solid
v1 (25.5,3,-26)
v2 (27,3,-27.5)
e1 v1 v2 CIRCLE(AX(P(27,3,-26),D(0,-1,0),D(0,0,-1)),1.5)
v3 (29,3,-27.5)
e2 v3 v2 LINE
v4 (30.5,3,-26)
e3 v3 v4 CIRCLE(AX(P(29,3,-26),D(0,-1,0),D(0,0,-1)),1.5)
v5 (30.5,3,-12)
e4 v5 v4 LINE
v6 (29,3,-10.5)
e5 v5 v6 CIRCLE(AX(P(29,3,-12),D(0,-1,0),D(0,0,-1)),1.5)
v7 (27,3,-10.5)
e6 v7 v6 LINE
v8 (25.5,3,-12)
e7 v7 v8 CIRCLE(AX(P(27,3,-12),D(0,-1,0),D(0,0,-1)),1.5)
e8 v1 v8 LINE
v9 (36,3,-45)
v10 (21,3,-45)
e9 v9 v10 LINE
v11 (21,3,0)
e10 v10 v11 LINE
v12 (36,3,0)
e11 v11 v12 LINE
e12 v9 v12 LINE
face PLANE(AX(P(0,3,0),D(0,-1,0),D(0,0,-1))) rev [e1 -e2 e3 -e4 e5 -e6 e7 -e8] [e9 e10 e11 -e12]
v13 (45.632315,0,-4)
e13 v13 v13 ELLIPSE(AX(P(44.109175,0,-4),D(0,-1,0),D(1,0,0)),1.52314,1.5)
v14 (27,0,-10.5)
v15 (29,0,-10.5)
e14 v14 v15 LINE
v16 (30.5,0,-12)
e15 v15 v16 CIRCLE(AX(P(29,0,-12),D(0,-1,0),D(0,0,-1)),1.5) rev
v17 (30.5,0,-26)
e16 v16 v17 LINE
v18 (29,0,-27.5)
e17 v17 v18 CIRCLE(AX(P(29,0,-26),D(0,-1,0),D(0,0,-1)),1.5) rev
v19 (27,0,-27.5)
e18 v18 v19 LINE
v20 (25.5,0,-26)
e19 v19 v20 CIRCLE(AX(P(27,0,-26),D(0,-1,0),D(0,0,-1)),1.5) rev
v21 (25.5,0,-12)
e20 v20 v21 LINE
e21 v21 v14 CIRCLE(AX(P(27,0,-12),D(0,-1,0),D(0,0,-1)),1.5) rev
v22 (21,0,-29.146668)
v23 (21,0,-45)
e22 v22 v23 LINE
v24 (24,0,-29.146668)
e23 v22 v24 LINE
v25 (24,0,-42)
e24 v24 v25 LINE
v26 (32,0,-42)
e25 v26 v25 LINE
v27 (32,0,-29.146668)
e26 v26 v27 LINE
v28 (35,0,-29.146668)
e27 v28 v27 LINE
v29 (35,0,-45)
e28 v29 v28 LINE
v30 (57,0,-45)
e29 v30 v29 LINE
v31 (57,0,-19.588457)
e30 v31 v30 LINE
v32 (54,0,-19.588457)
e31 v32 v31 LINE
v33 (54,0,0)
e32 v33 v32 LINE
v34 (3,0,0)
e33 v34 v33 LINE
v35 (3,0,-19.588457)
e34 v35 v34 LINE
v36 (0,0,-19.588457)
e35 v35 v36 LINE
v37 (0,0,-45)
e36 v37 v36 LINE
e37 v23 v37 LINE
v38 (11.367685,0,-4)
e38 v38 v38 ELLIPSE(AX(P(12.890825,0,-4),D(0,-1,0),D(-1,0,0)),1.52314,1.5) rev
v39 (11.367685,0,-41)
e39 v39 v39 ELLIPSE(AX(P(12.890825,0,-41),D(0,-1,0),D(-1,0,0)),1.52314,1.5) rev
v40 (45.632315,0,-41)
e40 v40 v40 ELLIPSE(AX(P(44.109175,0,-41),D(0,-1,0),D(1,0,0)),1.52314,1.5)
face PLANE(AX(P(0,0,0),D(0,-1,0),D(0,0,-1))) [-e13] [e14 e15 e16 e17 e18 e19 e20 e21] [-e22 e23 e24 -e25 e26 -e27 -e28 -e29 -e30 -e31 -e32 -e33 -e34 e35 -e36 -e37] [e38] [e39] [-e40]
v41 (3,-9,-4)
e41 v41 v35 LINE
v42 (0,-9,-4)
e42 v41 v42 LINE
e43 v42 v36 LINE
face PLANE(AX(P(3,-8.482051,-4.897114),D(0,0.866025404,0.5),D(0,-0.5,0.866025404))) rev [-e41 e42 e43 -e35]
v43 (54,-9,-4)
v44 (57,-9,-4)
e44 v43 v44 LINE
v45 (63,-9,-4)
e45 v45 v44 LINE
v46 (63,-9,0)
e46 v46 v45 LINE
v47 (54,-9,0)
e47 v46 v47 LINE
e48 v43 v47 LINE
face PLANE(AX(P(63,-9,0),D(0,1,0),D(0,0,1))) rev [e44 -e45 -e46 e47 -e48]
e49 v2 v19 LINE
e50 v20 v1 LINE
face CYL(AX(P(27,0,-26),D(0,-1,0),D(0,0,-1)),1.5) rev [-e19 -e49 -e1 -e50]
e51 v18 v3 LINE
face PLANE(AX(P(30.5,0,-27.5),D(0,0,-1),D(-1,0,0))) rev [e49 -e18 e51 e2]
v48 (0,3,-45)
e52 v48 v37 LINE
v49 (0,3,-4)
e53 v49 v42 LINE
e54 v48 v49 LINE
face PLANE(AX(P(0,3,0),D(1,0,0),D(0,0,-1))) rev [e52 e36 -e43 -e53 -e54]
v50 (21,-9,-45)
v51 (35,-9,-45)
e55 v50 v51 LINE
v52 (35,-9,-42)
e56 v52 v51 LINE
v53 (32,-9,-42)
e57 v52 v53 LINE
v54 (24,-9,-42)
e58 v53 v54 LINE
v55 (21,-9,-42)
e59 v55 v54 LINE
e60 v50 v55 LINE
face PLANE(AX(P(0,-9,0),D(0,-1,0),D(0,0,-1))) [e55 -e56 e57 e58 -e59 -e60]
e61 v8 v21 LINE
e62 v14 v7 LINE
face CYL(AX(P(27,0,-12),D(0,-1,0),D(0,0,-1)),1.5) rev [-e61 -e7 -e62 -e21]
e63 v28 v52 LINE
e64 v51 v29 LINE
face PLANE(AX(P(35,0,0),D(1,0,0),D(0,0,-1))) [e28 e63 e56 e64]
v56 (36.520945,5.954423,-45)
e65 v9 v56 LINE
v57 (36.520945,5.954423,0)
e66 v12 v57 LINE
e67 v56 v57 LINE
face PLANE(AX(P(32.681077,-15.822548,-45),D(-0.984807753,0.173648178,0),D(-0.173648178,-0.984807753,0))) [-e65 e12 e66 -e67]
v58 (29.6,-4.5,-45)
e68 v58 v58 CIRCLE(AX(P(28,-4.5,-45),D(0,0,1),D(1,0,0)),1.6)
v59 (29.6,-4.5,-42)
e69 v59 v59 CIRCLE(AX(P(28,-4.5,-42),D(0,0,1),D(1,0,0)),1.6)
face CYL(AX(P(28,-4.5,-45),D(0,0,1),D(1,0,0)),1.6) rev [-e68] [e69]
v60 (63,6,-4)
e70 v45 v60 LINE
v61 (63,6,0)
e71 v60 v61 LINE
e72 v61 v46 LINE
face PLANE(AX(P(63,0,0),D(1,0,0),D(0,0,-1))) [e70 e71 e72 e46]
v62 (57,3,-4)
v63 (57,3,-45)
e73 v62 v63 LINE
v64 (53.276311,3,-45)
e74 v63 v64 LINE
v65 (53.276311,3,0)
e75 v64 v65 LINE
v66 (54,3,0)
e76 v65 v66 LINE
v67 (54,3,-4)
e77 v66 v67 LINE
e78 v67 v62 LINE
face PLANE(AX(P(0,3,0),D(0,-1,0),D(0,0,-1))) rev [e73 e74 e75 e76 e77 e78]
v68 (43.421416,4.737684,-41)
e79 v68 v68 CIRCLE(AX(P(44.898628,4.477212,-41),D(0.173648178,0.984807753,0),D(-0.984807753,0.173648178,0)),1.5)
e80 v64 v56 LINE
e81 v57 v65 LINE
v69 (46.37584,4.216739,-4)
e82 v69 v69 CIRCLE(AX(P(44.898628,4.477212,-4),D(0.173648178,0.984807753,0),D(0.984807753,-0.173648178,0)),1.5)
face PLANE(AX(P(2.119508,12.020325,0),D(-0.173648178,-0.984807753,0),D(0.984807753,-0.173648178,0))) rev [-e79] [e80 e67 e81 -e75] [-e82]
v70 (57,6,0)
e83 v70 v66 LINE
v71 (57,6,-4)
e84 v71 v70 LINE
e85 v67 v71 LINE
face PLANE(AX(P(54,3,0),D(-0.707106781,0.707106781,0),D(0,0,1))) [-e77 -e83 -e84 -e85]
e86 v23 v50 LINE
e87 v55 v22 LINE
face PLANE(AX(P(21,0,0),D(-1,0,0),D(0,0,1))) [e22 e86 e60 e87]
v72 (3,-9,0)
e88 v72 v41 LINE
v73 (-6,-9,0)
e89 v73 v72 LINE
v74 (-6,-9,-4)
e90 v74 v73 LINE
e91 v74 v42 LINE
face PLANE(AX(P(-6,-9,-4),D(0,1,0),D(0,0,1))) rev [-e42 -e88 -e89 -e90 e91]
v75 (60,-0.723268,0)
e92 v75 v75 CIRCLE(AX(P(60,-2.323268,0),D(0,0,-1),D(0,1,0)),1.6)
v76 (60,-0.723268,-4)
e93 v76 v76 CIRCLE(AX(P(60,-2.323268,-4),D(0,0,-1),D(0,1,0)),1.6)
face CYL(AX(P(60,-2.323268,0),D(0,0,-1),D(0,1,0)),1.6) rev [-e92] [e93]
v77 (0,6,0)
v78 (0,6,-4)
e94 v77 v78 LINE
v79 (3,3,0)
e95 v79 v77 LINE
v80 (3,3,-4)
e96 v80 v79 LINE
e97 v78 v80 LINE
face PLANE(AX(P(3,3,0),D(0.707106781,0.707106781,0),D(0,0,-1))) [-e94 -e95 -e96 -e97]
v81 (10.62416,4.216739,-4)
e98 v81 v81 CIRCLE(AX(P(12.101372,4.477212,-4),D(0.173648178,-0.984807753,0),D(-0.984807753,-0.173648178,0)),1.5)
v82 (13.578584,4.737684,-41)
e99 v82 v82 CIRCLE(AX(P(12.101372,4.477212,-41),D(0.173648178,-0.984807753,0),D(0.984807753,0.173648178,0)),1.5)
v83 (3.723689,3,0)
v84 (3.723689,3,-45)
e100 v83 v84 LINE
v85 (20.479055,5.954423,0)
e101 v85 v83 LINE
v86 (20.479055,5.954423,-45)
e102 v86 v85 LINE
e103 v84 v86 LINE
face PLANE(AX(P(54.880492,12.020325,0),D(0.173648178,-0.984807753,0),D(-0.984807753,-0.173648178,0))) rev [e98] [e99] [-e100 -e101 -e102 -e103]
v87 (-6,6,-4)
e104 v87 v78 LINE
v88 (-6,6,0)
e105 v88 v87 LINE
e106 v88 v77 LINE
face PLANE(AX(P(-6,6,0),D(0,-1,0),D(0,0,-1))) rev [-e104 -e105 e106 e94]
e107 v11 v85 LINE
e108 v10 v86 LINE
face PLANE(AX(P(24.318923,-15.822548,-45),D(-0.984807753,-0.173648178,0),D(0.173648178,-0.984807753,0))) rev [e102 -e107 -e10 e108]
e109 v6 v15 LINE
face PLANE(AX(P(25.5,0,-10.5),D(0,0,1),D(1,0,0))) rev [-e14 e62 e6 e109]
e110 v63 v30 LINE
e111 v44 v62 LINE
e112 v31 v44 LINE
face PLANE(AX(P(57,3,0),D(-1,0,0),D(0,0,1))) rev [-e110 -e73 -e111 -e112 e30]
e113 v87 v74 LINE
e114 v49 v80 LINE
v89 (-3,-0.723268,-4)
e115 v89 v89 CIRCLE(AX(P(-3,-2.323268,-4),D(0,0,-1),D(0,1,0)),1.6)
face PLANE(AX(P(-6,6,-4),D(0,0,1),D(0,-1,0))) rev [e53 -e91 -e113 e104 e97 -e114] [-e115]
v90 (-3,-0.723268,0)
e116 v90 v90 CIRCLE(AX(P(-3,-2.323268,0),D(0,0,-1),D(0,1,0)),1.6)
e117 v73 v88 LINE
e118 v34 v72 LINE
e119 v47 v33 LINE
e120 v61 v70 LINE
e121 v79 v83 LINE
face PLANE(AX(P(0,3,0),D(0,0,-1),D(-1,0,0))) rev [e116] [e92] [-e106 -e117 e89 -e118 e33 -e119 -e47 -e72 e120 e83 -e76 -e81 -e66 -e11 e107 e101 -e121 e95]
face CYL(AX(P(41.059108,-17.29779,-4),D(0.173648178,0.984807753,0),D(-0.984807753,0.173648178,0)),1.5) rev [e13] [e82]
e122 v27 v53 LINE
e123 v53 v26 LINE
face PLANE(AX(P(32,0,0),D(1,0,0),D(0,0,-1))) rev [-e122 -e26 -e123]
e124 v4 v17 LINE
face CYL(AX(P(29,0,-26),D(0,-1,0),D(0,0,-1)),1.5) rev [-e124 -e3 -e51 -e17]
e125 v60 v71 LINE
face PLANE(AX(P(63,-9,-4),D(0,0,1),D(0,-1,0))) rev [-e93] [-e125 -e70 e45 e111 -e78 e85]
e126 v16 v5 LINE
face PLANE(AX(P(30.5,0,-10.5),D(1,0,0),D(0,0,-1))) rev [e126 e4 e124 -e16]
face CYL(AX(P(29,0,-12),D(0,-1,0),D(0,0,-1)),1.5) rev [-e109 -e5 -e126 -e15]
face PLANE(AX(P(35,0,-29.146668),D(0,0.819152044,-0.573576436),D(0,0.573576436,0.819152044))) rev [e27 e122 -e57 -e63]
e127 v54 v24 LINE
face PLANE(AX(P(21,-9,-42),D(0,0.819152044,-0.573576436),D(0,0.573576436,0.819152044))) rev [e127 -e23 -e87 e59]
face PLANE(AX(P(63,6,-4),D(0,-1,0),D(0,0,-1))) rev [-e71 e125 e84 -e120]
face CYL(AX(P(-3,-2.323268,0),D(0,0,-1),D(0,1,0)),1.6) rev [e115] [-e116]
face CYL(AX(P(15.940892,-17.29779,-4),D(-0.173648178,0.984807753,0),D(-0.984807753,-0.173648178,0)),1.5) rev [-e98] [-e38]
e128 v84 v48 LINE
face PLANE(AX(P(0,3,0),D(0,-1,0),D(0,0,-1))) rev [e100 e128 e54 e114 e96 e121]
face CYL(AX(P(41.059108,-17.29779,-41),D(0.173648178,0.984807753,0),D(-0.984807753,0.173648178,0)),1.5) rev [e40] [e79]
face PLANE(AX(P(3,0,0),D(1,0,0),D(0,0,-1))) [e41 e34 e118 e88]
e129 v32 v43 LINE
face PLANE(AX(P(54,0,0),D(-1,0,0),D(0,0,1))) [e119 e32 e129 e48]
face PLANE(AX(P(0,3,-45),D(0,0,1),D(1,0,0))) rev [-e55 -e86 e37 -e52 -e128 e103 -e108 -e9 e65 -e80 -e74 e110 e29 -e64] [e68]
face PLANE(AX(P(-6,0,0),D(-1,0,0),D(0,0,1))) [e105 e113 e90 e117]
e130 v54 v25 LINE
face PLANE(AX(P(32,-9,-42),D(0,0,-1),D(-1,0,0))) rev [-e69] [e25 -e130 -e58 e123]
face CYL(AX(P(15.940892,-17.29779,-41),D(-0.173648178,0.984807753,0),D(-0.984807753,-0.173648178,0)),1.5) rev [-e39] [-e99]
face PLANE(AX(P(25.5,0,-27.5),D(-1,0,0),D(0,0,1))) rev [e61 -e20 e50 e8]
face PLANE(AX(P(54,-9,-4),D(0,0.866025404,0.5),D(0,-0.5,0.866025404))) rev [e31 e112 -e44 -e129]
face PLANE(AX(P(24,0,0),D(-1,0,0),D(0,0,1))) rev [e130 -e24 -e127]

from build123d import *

# Parameters (mm, degrees)
SKETCH_1_W          = 57
SKETCH_1_H          = 45
EXTRUDE_1_DEPTH     = 3
SKETCH_2_W          = 4
SKETCH_2_H          = 15
EXTRUDE_2_DEPTH     = 6
SKETCH_3_W          = 4
SKETCH_3_H          = 15
EXTRUDE_3_DEPTH     = 6
EXTRUDE_4_DEPTH     = 3
SKETCH_5_W          = 4
SKETCH_5_H          = 9
EXTRUDE_5_DEPTH     = 3
CHAMFER_1_SIZE      = 3
SKETCH_6_R          = 1.6
CUT_EXTRUDE_1_DEPTH = 4
SKETCH_8_W          = 8
SKETCH_8_H          = 3
EXTRUDE_6_DEPTH     = 9
EXTRUDE_7_DEPTH     = 3
EXTRUDE_8_DEPTH     = 3
SKETCH_11_R         = 1.6
CUT_EXTRUDE_3_DEPTH = 3
SKETCH_12_W         = 5
SKETCH_12_H         = 17
CUT_EXTRUDE_4_DEPTH = 3
FILLET_1_R          = 1.5
EXTRUDE_9_REACH     = 80.57
SKETCH_15_W         = 45
SKETCH_15_H         = 17.726539555
SKETCH_16_R         = 1.5
CUT_EXTRUDE_5_DEPTH = 79.570276896


with BuildPart() as part:
    # 草图1 → 凸台-拉伸1 (new body)
    with BuildSketch(Plane(origin=(0, 0, 0), x_dir=(1, 0, 0), z_dir=(0, 1, 0))):
        with Locations((28.5, 22.5)):
            Rectangle(SKETCH_1_W, SKETCH_1_H)
    extrude(amount=EXTRUDE_1_DEPTH)

    # 草图2 → 凸台-拉伸2 (add)
    with BuildSketch(Plane.ZY):
        with Locations((-2, -1.5)):
            Rectangle(SKETCH_2_W, SKETCH_2_H)
    extrude(amount=EXTRUDE_2_DEPTH)

    # 草图3 → 凸台-拉伸3 (add)
    with BuildSketch(Plane(origin=(57, 0, 0), x_dir=(0, 0, -1), z_dir=(1, 0, 0))):
        with Locations((2, -1.5)):
            Rectangle(SKETCH_3_W, SKETCH_3_H)
    extrude(amount=EXTRUDE_3_DEPTH)

    # 草图4 → 凸台-拉伸4 (add)
    with BuildSketch(Plane.ZY.offset(-57)):
        Polygon((-4, -9), (-19.588457268, 0), (0, 0), (0, -9), align=None)
    extrude(amount=EXTRUDE_4_DEPTH)

    # 草图5 → 凸台-拉伸5 (add)
    with BuildSketch(Plane(origin=(0, 0, 0), x_dir=(0, 0, -1), z_dir=(1, 0, 0))):
        Polygon((19.588457268, 0), (4, 0), (4, -9), align=None)
        with Locations((2, -4.5)):
            Rectangle(SKETCH_5_W, SKETCH_5_H)
    extrude(amount=EXTRUDE_5_DEPTH)

    # 倒角1
    chamfer_1_edges = [part.edges().sort_by_distance(p)[0] for p in [
        (0, 3, -2),
        (57, 3, -2),
    ]]
    chamfer(chamfer_1_edges, length=CHAMFER_1_SIZE - 0.0001)  # a hair under: the kernel refuses the full size

    # 草图6 → 切除-拉伸1 (cut)
    with BuildSketch(Plane(origin=(0, 0, -4), x_dir=(-1, 0, 0), z_dir=(0, 0, -1))):
        with Locations(Location((3, -2.323268139, 0), (0, 0, 90))):
            Circle(SKETCH_6_R)
        with Locations(Location((-60, -2.323268139, 0), (0, 0, 90))):
            Circle(SKETCH_6_R)
    extrude(amount=-CUT_EXTRUDE_1_DEPTH, mode=Mode.SUBTRACT)

    # 草图8 → 凸台-拉伸6 (add)
    with BuildSketch(Plane.XZ):
        with Locations((28, -43.5)):
            Rectangle(SKETCH_8_W, SKETCH_8_H)
    extrude(amount=EXTRUDE_6_DEPTH)

    # 草图9 → 凸台-拉伸7 (add)
    with BuildSketch(Plane(origin=(32, 0, 0), x_dir=(0, 0, -1), z_dir=(1, 0, 0))):
        Polygon((45, 0), (29.146667939, 0), (42, -9), (45, -9), align=None)
    extrude(amount=EXTRUDE_7_DEPTH)

    # 草图10 → 凸台-拉伸8 (add)
    with BuildSketch(Plane.ZY.offset(-24)):
        Polygon((-45, 0), (-45, -9), (-42, -9), (-29.146667939, 0), align=None)
    extrude(amount=EXTRUDE_8_DEPTH)

    # 草图11 → 切除-拉伸3 (cut)
    with BuildSketch(Plane.XY.offset(-42)):
        with Locations((28, -4.5)):
            Circle(SKETCH_11_R)
    extrude(amount=-CUT_EXTRUDE_3_DEPTH, mode=Mode.SUBTRACT)

    # 草图12 → 切除-拉伸4 (cut)
    with BuildSketch(Plane(origin=(0, 3, 0), x_dir=(1, 0, 0), z_dir=(0, 1, 0))):
        with Locations((28, 19)):
            Rectangle(SKETCH_12_W, SKETCH_12_H)
    extrude(amount=-CUT_EXTRUDE_4_DEPTH, mode=Mode.SUBTRACT)

    # 圆角1
    fillet_1_edges = [part.edges().sort_by_distance(p)[0] for p in [
        (25.5, 1.5, -27.5),
        (30.5, 1.5, -27.5),
        (30.5, 1.5, -10.5),
        (25.5, 1.5, -10.5),
    ]]
    fillet(fillet_1_edges, radius=FILLET_1_R)

    # 草图15 → 凸台-拉伸9 (add, up to next)
    with BuildSketch(Plane(origin=(2.119507574, 12.02032477, 0), x_dir=(0, 0, 1), z_dir=(0.17364817766693066, 0.9848077530122081, 0)), mode=Mode.PRIVATE) as extrude_9_sk1:
        with Locations((-22.5, 43.795404353)):
            Rectangle(SKETCH_15_W, SKETCH_15_H)
    extrude_9_tool1 = extrude(extrude_9_sk1.sketch, amount=-EXTRUDE_9_REACH, mode=Mode.PRIVATE) - part.part
    extrude_9 = extrude_9_tool1.solids().sort_by_distance((45.249561, 4.415333, -22.5))[0]
    add(extrude_9)

    # 草图16 → 切除-拉伸5 (cut, through all)
    with BuildSketch(Plane(origin=(2.119507574, 12.02032477, 0), x_dir=(0.9848077530122081, -0.17364817766693064, 0), z_dir=(0.17364817766693064, 0.9848077530122081, 0))):
        with Locations(Location((43.439057305, 41, 0), (0, 0, 180))):
            Circle(SKETCH_16_R)
        with Locations((43.439057305, 4)):
            Circle(SKETCH_16_R)
    cut_extrude_5 = extrude(amount=-CUT_EXTRUDE_5_DEPTH, mode=Mode.SUBTRACT)

    # 镜向1: 凸台-拉伸9, 切除-拉伸5 across plane
    add(extrude_9.mirror(Plane(origin=(28.5, 0, 0), x_dir=(0, 0, 1), z_dir=(1, 0, 0))))
    add(cut_extrude_5.mirror(Plane(origin=(28.5, 0, 0), x_dir=(0, 0, 1), z_dir=(1, 0, 0))), mode=Mode.SUBTRACT)


solid = part.part
